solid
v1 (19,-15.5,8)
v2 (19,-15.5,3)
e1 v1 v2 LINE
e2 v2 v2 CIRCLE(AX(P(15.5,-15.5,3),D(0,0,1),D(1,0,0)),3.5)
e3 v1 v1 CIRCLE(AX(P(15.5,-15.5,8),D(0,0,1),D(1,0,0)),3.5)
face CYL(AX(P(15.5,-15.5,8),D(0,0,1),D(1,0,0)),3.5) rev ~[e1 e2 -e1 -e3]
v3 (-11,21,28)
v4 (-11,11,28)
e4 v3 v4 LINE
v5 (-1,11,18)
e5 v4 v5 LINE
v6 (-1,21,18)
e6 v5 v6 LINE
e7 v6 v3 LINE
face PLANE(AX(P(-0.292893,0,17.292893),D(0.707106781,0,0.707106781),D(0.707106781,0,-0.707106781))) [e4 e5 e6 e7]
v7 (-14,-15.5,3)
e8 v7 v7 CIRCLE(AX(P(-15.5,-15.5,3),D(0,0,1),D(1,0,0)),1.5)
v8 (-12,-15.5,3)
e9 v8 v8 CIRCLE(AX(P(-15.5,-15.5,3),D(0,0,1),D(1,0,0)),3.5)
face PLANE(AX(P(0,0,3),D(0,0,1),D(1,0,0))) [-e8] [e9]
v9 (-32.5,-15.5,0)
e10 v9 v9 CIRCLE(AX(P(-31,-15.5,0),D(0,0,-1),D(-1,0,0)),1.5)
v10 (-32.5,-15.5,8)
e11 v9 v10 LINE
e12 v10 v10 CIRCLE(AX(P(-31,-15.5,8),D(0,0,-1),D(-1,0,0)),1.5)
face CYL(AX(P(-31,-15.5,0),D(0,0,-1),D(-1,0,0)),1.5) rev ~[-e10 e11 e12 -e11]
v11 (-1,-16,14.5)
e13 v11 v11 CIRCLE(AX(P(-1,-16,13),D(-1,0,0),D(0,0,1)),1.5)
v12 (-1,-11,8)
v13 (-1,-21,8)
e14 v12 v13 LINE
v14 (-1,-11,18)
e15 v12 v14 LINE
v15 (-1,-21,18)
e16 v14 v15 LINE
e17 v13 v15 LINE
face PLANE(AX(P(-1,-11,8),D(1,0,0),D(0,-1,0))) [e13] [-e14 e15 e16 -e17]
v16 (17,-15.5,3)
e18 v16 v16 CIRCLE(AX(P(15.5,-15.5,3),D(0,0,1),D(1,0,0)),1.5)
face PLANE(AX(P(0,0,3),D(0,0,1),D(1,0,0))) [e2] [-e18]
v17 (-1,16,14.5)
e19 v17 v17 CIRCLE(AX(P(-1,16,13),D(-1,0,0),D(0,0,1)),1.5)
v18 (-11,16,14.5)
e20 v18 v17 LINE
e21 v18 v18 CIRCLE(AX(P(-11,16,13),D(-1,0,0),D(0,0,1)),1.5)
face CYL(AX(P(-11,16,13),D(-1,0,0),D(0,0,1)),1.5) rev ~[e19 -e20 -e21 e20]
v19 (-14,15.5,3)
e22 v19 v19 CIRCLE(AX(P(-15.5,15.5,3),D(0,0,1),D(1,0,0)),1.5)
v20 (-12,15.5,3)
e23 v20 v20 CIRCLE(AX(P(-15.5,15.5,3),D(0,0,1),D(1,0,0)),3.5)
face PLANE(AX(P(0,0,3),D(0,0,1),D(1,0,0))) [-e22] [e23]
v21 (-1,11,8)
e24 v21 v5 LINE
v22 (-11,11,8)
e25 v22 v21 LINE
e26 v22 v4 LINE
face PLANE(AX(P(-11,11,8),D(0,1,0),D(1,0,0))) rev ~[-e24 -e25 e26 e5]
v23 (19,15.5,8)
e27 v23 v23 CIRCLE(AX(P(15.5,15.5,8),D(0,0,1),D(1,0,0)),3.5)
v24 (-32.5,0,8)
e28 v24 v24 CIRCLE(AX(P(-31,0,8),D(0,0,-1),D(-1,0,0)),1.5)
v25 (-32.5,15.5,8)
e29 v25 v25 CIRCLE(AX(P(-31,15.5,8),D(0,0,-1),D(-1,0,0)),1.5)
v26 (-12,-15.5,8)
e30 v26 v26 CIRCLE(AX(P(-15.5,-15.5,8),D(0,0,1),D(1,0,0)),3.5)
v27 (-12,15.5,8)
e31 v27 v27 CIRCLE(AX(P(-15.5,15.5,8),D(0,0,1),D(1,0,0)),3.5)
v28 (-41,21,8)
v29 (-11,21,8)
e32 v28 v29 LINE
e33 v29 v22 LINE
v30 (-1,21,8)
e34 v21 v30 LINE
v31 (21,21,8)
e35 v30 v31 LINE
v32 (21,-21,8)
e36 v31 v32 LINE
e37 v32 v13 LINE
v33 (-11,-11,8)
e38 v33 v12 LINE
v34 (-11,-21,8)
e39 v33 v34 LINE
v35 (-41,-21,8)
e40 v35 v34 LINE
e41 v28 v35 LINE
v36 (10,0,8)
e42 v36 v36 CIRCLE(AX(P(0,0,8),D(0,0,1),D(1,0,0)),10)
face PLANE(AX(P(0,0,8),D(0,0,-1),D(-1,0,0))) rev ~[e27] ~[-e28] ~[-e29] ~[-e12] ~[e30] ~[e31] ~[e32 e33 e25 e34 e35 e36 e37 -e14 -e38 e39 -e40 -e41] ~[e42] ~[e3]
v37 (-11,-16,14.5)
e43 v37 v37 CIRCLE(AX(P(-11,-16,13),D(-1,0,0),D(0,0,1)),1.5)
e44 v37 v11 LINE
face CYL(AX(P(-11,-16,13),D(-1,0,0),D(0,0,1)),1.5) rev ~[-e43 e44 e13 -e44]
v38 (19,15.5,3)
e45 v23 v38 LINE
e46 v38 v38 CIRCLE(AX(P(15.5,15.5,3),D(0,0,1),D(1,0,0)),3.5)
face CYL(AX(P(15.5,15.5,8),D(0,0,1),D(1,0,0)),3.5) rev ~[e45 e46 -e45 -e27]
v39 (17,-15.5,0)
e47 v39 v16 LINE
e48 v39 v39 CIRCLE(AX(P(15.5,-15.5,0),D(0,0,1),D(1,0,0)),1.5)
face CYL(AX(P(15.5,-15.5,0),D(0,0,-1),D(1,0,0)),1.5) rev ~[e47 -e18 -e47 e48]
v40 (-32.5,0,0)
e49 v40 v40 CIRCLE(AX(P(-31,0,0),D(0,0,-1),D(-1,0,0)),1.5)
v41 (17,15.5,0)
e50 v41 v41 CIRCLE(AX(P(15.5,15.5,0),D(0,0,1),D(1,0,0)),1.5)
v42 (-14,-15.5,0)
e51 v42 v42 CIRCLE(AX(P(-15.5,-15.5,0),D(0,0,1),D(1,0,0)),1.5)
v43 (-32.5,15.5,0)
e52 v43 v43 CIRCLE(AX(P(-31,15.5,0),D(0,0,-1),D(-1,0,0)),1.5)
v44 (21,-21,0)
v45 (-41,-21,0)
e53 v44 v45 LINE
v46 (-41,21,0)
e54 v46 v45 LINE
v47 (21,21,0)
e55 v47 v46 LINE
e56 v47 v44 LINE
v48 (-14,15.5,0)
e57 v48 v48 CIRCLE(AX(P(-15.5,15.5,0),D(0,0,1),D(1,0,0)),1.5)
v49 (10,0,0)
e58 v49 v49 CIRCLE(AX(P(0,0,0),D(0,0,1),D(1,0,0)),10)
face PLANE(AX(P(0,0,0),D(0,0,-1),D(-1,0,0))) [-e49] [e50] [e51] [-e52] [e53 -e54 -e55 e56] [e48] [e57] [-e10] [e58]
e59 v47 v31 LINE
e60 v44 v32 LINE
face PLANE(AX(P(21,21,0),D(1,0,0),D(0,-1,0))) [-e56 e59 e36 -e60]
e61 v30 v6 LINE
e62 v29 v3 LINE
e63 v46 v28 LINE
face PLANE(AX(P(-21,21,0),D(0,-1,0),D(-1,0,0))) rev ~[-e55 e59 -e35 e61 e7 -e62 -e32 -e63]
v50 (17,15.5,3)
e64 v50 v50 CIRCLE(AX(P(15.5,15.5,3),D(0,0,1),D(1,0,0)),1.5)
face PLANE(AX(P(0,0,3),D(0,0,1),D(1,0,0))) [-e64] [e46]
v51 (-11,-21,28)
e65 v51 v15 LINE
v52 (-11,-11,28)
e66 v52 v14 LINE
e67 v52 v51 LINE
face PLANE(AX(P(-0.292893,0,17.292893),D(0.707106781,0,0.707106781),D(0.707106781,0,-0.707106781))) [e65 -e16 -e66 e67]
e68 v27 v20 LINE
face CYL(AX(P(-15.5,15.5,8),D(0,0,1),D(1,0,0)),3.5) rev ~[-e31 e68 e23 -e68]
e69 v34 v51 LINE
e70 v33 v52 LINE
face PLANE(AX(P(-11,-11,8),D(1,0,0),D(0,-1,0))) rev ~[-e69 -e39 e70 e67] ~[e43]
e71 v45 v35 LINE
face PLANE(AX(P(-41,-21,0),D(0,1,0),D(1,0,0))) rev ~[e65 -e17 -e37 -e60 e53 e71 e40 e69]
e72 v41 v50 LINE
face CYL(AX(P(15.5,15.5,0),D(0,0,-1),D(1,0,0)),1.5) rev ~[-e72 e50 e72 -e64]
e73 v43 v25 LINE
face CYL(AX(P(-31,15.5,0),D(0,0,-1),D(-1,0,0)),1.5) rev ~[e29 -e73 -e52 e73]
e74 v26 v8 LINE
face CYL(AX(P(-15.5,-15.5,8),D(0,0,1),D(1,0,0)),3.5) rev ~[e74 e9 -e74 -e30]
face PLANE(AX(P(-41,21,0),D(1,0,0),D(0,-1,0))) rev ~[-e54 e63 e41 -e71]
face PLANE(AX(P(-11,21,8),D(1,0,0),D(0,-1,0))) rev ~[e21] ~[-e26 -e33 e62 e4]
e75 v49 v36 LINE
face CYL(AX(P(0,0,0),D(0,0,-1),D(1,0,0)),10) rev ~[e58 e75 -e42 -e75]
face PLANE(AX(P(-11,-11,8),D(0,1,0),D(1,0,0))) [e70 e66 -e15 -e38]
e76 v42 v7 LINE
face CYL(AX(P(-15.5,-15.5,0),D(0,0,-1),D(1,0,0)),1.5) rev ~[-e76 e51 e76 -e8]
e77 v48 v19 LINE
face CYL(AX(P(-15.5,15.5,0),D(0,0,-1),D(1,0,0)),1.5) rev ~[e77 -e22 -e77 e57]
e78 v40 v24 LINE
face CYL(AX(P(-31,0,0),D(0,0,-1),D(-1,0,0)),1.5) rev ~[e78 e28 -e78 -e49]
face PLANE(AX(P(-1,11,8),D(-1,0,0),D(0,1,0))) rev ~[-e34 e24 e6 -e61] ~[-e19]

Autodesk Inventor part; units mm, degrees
ref_plane "YZ Plane" through (0, 0, 0) normal (1, 0, 0) x (0, 1, 0)
ref_plane "XZ Plane" through (0, 0, 0) normal (0, 1, 0) x (-1, 0, 0)
ref_plane "XY Plane" through (0, 0, 0) normal (0, 0, 1) x (1, 0, 0)
sketch "Sketch1" plane through (0, 0, 0) normal (0, 0, 1) x (1, 0, 0)
  line L0 (21, -21) -> (-21, -21)
  line L1 (-21, -21) -> (-21, 21)
  line L2 (-21, 21) -> (21, 21)
  line L3 (21, 21) -> (21, -21)
  line L4 (21, -21) -> (-21, 21) construction
  line L5 (-21, -21) -> (21, 21) construction
  circle A0 centre (-15.5, 15.5) radius 1.5
  circle A1 centre (15.5, 15.5) radius 1.5
  circle A2 centre (15.5, -15.5) radius 1.5
  circle A3 centre (-15.5, -15.5) radius 1.5
  line L6 (-15.5, 15.5) -> (-15.5, -15.5) construction
  line L7 (-15.5, 15.5) -> (15.5, 15.5) construction
  line L8 (15.5, 15.5) -> (15.5, -15.5) construction
  circle A4 centre (-15.5, 15.5) radius 4.5
  circle A5 centre (15.5, 15.5) radius 4.5
  circle A6 centre (15.5, -15.5) radius 4.5
  circle A7 centre (-15.5, -15.5) radius 4.5
  circle A8 centre (0, 0) radius 10
  dimension "d0" = 42
  dimension "d1" = 42
  dimension "d2" = 31
  dimension "d3" = 3
  dimension "d4" = 3
  dimension "d7" = 20
extrude "Extrusion1" add sketch "Sketch1" along normal blind 8 contours L0 L1 L2 L3 | A4 | A5 | A6 | A7
sketch "Sketch2" plane through (0, 0, 8) normal (0, 0, 1) x (1, 0, 0)
  line L0 (21, 21) -> (-21, 21) projected
  line L1 (-21, 21) -> (-21, -21) projected
  line L2 (-21, -21) -> (21, -21) projected
  line L3 (21, -21) -> (21, 21) projected
  circle A0 centre (-15.5, 15.5) radius 1.5 projected
  circle A1 centre (15.5, 15.5) radius 1.5 projected
  circle A2 centre (15.5, -15.5) radius 1.5 projected
  circle A3 centre (0, 0) radius 10 projected
  circle A4 centre (-15.5, -15.5) radius 1.5 projected
  circle A5 centre (-15.5, 15.5) radius 3.5
  circle A6 centre (15.5, 15.5) radius 3.5
  circle A7 centre (15.5, -15.5) radius 3.5
  circle A8 centre (-15.5, -15.5) radius 3.5
  dimension "d10" = 7
extrude "Extrusion3" cut sketch "Sketch2" against normal blind 5 contours A5 | A6 | A7 | A8
sketch "Sketch3" plane through (0, 0, 8) normal (0, 0, 1) x (1, 0, 0)
  circle A0 centre (15.5, -15.5) radius 3.5 projected
  circle A1 centre (15.5, 15.5) radius 3.5 projected
  circle A2 centre (-15.5, -15.5) radius 3.5 projected
  circle A3 centre (-15.5, 15.5) radius 3.5 projected
  line L0 (21, 21) -> (-21, 21) projected
  line L1 (-21, 21) -> (-21, -21) projected
  line L2 (-21, -21) -> (21, -21) projected
  line L3 (21, -21) -> (21, 21) projected
  circle A4 centre (0, 0) radius 10 projected
  line L4 (-11, 21) -> (-11, -21)
  line L5 (-11, 11) -> (-1, 11)
  line L6 (-1, 11) -> (-1, 21)
  line L7 (-11, -11) -> (-1, -11)
  line L8 (-1, -11) -> (-1, -21)
  dimension "d13" = 10
  dimension "d14" = 10
  dimension "d15" = 10
extrude "Extrusion4" add sketch "Sketch3" along normal blind 10 contours L6 L5 L4 L0 | L2 L4 L7 L8
sketch "Sketch4" plane through (0, 0, 0) normal (0, 0, -1) x (-1, 0, 0)
  line L0 (21, 21) -> (21, -21) projected
  line L1 (21, 21) -> (41, 21)
  line L2 (41, 21) -> (41, -21)
  line L3 (41, -21) -> (21, -21)
  circle A0 centre (31, 15.5) radius 1.5
  circle A1 centre (31, -15.5) radius 1.5
  line L4 (31, 15.5) -> (31, -15.5) construction
  line L5 (31, 0) -> (21, 0) construction
  circle A2 centre (31, 0) radius 1.5
  point P0 (0, 0)
  dimension "d18" = 31
  dimension "d19" = 10
  dimension "d20" = 10
  dimension "d21" = 3
extrude "Extrusion5" add sketch "Sketch4" against normal up to surface (8 mm away)
sketch "Sketch5" plane through (-11, 11, 8) normal (-1, 0, 0) x (0, 0, 1)
  line L0 (0, 0) -> (0, 10) projected
  line L1 (0, 0) -> (10, 0) projected
  line L2 (10, 10) -> (10, 0) projected
  line L3 (0, 10) -> (10, 10) projected
  line L4 (0, -32) -> (0, -22) projected
  line L5 (0, -32) -> (10, -32) projected
  line L6 (10, -22) -> (10, -32) projected
  line L7 (0, -22) -> (10, -22) projected
  line L8 (10, 10) -> (0, 0) construction
  line L9 (10, 0) -> (0, 10) construction
  line L10 (10, -32) -> (0, -22) construction
  line L11 (10, -22) -> (0, -32) construction
  circle A0 centre (5, 5) radius 1.5
  circle A1 centre (5, -27) radius 1.5
  point P0 (-8, -11)
  dimension "d24" = 3
  dimension "d25" = 3
extrude "Extrusion6" cut sketch "Sketch5" against normal through all contours A0 | A1
draft "FaceDraft1" angle 45 pull direction (1, 0, 0) faces at (-7.6667, -14.3333, 18) (-7.6667, 17.6667, 18) fixed edges at (-1, -16, 18) (-1, 16, 18)
properties part number "end motor holder"
